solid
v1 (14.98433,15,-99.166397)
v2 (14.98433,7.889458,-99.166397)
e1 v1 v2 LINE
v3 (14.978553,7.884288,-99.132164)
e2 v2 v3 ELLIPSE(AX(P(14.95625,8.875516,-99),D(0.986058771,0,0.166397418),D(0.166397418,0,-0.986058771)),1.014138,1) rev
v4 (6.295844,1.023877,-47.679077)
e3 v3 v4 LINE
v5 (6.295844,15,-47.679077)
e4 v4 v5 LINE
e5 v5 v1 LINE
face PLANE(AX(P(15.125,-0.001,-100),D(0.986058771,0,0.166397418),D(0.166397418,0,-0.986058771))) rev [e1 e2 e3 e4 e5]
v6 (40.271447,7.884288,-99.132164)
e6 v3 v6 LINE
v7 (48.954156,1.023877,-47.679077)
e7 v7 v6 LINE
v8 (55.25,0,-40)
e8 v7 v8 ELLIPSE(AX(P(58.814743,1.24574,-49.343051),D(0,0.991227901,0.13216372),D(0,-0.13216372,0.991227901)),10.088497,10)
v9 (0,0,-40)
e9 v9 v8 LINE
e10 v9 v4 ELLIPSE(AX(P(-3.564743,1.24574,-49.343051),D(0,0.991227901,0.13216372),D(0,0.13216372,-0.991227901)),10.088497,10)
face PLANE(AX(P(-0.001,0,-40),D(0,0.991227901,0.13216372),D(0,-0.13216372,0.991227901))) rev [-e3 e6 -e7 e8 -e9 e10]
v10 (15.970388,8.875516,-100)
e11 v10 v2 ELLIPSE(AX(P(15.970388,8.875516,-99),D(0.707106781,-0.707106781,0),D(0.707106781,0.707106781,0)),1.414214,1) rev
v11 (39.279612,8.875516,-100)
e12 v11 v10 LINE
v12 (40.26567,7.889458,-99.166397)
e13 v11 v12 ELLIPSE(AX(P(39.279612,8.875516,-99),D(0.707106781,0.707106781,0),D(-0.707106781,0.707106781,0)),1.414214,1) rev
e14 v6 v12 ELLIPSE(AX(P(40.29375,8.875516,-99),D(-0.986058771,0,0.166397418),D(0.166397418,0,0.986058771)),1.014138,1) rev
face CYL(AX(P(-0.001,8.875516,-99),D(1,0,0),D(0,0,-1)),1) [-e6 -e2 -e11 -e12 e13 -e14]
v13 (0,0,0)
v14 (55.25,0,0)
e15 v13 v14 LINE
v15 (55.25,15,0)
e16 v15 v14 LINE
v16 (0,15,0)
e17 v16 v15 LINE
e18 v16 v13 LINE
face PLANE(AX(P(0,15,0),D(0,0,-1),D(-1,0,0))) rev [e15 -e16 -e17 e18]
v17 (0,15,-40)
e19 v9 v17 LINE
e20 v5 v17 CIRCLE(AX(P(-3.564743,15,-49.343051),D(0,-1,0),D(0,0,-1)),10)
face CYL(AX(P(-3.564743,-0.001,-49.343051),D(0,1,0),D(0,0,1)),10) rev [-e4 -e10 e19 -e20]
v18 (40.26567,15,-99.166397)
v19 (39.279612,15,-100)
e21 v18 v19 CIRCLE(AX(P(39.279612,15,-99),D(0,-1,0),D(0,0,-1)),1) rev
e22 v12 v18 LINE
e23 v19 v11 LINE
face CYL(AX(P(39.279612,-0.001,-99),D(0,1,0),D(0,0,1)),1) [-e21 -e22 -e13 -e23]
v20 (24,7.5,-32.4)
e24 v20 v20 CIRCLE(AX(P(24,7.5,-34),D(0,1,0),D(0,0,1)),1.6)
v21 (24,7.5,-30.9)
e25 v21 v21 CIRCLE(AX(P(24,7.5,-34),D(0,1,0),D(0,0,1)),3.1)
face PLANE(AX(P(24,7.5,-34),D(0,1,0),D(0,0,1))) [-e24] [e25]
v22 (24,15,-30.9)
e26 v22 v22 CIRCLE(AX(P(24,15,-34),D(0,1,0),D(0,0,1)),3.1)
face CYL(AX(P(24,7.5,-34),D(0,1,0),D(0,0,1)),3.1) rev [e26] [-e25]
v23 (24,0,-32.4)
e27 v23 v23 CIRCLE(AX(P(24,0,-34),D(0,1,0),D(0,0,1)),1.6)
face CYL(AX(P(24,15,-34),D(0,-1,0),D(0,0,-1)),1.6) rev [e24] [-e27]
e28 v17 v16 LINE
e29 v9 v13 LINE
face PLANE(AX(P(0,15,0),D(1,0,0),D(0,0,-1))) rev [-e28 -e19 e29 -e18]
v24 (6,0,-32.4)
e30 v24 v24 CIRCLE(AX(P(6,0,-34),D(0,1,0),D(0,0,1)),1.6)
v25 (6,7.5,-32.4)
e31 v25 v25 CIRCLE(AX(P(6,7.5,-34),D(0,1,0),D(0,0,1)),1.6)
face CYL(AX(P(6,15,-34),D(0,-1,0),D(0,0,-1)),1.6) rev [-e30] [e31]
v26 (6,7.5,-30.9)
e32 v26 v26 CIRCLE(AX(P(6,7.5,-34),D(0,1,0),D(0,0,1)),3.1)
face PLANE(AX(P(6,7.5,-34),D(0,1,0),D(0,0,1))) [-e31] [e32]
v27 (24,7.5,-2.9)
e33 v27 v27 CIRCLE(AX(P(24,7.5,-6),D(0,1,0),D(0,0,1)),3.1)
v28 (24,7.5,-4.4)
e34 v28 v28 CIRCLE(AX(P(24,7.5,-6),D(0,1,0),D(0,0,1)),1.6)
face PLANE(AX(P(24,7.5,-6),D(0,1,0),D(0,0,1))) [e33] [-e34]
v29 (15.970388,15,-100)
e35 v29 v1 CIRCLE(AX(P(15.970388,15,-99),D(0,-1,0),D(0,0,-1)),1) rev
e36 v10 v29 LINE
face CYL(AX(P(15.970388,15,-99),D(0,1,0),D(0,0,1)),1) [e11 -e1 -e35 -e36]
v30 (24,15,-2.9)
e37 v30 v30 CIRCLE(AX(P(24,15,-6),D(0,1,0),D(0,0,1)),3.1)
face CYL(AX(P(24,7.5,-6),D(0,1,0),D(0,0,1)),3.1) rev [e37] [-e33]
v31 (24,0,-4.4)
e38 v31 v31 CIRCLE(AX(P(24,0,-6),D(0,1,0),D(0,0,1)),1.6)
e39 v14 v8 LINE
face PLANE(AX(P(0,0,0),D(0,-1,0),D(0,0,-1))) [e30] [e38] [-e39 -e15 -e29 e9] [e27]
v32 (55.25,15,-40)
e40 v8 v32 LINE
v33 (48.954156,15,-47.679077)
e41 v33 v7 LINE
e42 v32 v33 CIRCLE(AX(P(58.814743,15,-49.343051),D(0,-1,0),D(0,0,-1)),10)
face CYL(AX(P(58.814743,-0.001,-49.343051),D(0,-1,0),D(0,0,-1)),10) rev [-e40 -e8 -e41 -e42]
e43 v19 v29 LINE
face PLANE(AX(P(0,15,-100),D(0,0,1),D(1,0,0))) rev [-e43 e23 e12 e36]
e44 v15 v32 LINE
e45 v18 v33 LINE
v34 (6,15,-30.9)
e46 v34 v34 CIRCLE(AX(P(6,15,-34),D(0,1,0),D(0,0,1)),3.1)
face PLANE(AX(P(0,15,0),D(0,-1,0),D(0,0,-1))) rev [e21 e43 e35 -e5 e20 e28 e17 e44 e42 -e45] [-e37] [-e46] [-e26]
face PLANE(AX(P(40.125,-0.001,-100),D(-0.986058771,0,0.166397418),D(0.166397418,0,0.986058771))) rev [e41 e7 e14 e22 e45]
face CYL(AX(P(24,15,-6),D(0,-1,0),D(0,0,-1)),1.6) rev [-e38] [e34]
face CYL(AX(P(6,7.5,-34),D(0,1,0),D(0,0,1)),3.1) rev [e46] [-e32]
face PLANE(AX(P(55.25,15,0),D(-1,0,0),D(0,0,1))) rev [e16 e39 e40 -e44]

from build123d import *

# Parameters (mm, degrees)
SKETCH1_W           = 55.25
SKETCH1_H           = 100
SKETCH1_R           = 1.6
BOSS_EXTRUDE1_DEPTH = 15
SKETCH2_R           = 3.1
CUT_EXTRUDE1_DEPTH  = 7.5
CUT_EXTRUDE3_REACH  = 117.228
CUT_EXTRUDE2_REACH  = 117.228
FILLET3_R           = 10
FILLET4_R           = 1


with BuildPart() as part:
    # Sketch1 → Boss-Extrude1 (new body)
    with BuildSketch(Plane(origin=(0, 0, 0), x_dir=(1, 0, 0), z_dir=(0, 1, 0))):
        with Locations((27.625, 50)):
            Rectangle(SKETCH1_W, SKETCH1_H)
        with Locations(Location((24, 6, 0), (0, 0, 270))):
            Circle(SKETCH1_R, mode=Mode.SUBTRACT)
        with Locations(Location((6, 34, 0), (0, 0, 270))):
            Circle(SKETCH1_R, mode=Mode.SUBTRACT)
        with Locations(Location((24, 34, 0), (0, 0, 270))):
            Circle(SKETCH1_R, mode=Mode.SUBTRACT)
    extrude(amount=BOSS_EXTRUDE1_DEPTH)

    # Sketch2 → Cut-Extrude1 (cut)
    with BuildSketch(Plane(origin=(0, 15, 0), x_dir=(1, 0, 0), z_dir=(0, 1, 0))):
        with Locations(Location((24, 34, 0), (0, 0, 270))):
            Circle(SKETCH2_R)
        with Locations(Location((24, 6, 0), (0, 0, 270))):
            Circle(SKETCH2_R)
        with Locations(Location((6, 34, 0), (0, 0, 270))):
            Circle(SKETCH2_R)
    extrude(amount=-CUT_EXTRUDE1_DEPTH, mode=Mode.SUBTRACT)

    # Sketch5 → Cut-Extrude3 (cut, up to next)
    with BuildSketch(Plane(origin=(55.25, 0, 0), x_dir=(0, 0, -1), z_dir=(1, 0, 0)), mode=Mode.PRIVATE) as cut_extrude3_sk1:
        Polygon((40, 0), (100, 8), (100, 0), align=None)
    cut_extrude3_tool1 = extrude(cut_extrude3_sk1.sketch, amount=-CUT_EXTRUDE3_REACH, mode=Mode.PRIVATE) & part.part
    add(cut_extrude3_tool1.solids().sort_by_distance((55.25, 2.666667, -80))[0], mode=Mode.SUBTRACT)

    # Sketch3 → Cut-Extrude2 (cut, up to next)
    with BuildSketch(Plane(origin=(0, 15, 0), x_dir=(1, 0, 0), z_dir=(0, 1, 0)), mode=Mode.PRIVATE) as cut_extrude2_sk1:
        Polygon((40.125, 100), (55.25, 100), (55.25, 40), (50.25, 40), align=None)
    cut_extrude2_tool1 = extrude(cut_extrude2_sk1.sketch, amount=-CUT_EXTRUDE2_REACH, mode=Mode.PRIVATE) & part.part
    # Sketch3 → Cut-Extrude2 (cut, up to next)
    with BuildSketch(Plane(origin=(0, 15, 0), x_dir=(1, 0, 0), z_dir=(0, 1, 0)), mode=Mode.PRIVATE) as cut_extrude2_sk2:
        Polygon((15.125, 100), (0, 100), (0, 40), (5, 40), align=None)
    cut_extrude2_tool2 = extrude(cut_extrude2_sk2.sketch, amount=-CUT_EXTRUDE2_REACH, mode=Mode.PRIVATE) & part.part
    add(cut_extrude2_tool1.solids().sort_by_distance((49.794255, 15, -75.031056))[0], mode=Mode.SUBTRACT)
    add(cut_extrude2_tool2.solids().sort_by_distance((5.455745, 15, -75.031056))[0], mode=Mode.SUBTRACT)

    # Fillet3
    # the kernel refuses this fillet: 10 mm, written as the material it adds along each edge
    with BuildSketch(Plane(origin=(5, 15, -40), x_dir=(-1, 0, 0), z_dir=(0, -1, 0))) as fillet3_piece_1_section:
        with BuildLine():
            CenterArc((8.564743476, 9.343051105), FILLET3_R, 189.578422919, 59.537746257)
            Line((-1.295844232, 7.679076929), (-1.493055986, 7.645797446))
            Line((-1.493055986, 7.645797446), (-0.197211754, -0.033279484))
            Line((-0.197211754, -0.033279484), (0, -0.2))
            ThreePointArc((0, -0.2), (2.5, -0.2), (4.92870513, -0.186861022))
            Line((4.92870513, -0.186861022), (5, 0))
        make_face()
    fillet3_piece_1 = extrude(amount=15, mode=Mode.PRIVATE)
    fillet3_piece_1 = split(fillet3_piece_1, bisect_by=Plane(origin=(4.040002964, 0.373004519, -42.797533893), z_dir=(0, 0.9912279006826347, 0.13216372009101796)), keep=Keep.TOP, mode=Mode.PRIVATE)
    add(fillet3_piece_1)
    with BuildSketch(Plane(origin=(50.25, 15, -40), x_dir=(1, 0, 0), z_dir=(0, -1, 0))) as fillet3_piece_2_section:
        with BuildLine():
            CenterArc((8.564743476, -9.343051105), FILLET3_R, 110.883830823, 59.537746257)
            Line((-1.295844232, -7.679076929), (-1.493055986, -7.645797446))
            Line((-1.493055986, -7.645797446), (-0.197211754, 0.033279484))
            Line((-0.197211754, 0.033279484), (0, 0.2))
            ThreePointArc((0, 0.2), (2.5, 0.2), (4.92870513, 0.186861022))
            Line((4.92870513, 0.186861022), (5, 0))
        make_face()
    fillet3_piece_2 = extrude(amount=15, mode=Mode.PRIVATE)
    fillet3_piece_2 = split(fillet3_piece_2, bisect_by=Plane(origin=(51.209997036, 0.373004519, -42.797533893), z_dir=(0, 0.9912279006826347, 0.13216372009101796)), keep=Keep.TOP, mode=Mode.PRIVATE)
    add(fillet3_piece_2)

    # Fillet4
    fillet4_edges = [part.edges().sort_by_distance(p)[0] for p in [
        (27.625, 8, -100),
        (15.125, 11.5, -100),
        (40.125, 11.5, -100),
    ]]
    fillet(fillet4_edges, radius=FILLET4_R)


solid = part.part
